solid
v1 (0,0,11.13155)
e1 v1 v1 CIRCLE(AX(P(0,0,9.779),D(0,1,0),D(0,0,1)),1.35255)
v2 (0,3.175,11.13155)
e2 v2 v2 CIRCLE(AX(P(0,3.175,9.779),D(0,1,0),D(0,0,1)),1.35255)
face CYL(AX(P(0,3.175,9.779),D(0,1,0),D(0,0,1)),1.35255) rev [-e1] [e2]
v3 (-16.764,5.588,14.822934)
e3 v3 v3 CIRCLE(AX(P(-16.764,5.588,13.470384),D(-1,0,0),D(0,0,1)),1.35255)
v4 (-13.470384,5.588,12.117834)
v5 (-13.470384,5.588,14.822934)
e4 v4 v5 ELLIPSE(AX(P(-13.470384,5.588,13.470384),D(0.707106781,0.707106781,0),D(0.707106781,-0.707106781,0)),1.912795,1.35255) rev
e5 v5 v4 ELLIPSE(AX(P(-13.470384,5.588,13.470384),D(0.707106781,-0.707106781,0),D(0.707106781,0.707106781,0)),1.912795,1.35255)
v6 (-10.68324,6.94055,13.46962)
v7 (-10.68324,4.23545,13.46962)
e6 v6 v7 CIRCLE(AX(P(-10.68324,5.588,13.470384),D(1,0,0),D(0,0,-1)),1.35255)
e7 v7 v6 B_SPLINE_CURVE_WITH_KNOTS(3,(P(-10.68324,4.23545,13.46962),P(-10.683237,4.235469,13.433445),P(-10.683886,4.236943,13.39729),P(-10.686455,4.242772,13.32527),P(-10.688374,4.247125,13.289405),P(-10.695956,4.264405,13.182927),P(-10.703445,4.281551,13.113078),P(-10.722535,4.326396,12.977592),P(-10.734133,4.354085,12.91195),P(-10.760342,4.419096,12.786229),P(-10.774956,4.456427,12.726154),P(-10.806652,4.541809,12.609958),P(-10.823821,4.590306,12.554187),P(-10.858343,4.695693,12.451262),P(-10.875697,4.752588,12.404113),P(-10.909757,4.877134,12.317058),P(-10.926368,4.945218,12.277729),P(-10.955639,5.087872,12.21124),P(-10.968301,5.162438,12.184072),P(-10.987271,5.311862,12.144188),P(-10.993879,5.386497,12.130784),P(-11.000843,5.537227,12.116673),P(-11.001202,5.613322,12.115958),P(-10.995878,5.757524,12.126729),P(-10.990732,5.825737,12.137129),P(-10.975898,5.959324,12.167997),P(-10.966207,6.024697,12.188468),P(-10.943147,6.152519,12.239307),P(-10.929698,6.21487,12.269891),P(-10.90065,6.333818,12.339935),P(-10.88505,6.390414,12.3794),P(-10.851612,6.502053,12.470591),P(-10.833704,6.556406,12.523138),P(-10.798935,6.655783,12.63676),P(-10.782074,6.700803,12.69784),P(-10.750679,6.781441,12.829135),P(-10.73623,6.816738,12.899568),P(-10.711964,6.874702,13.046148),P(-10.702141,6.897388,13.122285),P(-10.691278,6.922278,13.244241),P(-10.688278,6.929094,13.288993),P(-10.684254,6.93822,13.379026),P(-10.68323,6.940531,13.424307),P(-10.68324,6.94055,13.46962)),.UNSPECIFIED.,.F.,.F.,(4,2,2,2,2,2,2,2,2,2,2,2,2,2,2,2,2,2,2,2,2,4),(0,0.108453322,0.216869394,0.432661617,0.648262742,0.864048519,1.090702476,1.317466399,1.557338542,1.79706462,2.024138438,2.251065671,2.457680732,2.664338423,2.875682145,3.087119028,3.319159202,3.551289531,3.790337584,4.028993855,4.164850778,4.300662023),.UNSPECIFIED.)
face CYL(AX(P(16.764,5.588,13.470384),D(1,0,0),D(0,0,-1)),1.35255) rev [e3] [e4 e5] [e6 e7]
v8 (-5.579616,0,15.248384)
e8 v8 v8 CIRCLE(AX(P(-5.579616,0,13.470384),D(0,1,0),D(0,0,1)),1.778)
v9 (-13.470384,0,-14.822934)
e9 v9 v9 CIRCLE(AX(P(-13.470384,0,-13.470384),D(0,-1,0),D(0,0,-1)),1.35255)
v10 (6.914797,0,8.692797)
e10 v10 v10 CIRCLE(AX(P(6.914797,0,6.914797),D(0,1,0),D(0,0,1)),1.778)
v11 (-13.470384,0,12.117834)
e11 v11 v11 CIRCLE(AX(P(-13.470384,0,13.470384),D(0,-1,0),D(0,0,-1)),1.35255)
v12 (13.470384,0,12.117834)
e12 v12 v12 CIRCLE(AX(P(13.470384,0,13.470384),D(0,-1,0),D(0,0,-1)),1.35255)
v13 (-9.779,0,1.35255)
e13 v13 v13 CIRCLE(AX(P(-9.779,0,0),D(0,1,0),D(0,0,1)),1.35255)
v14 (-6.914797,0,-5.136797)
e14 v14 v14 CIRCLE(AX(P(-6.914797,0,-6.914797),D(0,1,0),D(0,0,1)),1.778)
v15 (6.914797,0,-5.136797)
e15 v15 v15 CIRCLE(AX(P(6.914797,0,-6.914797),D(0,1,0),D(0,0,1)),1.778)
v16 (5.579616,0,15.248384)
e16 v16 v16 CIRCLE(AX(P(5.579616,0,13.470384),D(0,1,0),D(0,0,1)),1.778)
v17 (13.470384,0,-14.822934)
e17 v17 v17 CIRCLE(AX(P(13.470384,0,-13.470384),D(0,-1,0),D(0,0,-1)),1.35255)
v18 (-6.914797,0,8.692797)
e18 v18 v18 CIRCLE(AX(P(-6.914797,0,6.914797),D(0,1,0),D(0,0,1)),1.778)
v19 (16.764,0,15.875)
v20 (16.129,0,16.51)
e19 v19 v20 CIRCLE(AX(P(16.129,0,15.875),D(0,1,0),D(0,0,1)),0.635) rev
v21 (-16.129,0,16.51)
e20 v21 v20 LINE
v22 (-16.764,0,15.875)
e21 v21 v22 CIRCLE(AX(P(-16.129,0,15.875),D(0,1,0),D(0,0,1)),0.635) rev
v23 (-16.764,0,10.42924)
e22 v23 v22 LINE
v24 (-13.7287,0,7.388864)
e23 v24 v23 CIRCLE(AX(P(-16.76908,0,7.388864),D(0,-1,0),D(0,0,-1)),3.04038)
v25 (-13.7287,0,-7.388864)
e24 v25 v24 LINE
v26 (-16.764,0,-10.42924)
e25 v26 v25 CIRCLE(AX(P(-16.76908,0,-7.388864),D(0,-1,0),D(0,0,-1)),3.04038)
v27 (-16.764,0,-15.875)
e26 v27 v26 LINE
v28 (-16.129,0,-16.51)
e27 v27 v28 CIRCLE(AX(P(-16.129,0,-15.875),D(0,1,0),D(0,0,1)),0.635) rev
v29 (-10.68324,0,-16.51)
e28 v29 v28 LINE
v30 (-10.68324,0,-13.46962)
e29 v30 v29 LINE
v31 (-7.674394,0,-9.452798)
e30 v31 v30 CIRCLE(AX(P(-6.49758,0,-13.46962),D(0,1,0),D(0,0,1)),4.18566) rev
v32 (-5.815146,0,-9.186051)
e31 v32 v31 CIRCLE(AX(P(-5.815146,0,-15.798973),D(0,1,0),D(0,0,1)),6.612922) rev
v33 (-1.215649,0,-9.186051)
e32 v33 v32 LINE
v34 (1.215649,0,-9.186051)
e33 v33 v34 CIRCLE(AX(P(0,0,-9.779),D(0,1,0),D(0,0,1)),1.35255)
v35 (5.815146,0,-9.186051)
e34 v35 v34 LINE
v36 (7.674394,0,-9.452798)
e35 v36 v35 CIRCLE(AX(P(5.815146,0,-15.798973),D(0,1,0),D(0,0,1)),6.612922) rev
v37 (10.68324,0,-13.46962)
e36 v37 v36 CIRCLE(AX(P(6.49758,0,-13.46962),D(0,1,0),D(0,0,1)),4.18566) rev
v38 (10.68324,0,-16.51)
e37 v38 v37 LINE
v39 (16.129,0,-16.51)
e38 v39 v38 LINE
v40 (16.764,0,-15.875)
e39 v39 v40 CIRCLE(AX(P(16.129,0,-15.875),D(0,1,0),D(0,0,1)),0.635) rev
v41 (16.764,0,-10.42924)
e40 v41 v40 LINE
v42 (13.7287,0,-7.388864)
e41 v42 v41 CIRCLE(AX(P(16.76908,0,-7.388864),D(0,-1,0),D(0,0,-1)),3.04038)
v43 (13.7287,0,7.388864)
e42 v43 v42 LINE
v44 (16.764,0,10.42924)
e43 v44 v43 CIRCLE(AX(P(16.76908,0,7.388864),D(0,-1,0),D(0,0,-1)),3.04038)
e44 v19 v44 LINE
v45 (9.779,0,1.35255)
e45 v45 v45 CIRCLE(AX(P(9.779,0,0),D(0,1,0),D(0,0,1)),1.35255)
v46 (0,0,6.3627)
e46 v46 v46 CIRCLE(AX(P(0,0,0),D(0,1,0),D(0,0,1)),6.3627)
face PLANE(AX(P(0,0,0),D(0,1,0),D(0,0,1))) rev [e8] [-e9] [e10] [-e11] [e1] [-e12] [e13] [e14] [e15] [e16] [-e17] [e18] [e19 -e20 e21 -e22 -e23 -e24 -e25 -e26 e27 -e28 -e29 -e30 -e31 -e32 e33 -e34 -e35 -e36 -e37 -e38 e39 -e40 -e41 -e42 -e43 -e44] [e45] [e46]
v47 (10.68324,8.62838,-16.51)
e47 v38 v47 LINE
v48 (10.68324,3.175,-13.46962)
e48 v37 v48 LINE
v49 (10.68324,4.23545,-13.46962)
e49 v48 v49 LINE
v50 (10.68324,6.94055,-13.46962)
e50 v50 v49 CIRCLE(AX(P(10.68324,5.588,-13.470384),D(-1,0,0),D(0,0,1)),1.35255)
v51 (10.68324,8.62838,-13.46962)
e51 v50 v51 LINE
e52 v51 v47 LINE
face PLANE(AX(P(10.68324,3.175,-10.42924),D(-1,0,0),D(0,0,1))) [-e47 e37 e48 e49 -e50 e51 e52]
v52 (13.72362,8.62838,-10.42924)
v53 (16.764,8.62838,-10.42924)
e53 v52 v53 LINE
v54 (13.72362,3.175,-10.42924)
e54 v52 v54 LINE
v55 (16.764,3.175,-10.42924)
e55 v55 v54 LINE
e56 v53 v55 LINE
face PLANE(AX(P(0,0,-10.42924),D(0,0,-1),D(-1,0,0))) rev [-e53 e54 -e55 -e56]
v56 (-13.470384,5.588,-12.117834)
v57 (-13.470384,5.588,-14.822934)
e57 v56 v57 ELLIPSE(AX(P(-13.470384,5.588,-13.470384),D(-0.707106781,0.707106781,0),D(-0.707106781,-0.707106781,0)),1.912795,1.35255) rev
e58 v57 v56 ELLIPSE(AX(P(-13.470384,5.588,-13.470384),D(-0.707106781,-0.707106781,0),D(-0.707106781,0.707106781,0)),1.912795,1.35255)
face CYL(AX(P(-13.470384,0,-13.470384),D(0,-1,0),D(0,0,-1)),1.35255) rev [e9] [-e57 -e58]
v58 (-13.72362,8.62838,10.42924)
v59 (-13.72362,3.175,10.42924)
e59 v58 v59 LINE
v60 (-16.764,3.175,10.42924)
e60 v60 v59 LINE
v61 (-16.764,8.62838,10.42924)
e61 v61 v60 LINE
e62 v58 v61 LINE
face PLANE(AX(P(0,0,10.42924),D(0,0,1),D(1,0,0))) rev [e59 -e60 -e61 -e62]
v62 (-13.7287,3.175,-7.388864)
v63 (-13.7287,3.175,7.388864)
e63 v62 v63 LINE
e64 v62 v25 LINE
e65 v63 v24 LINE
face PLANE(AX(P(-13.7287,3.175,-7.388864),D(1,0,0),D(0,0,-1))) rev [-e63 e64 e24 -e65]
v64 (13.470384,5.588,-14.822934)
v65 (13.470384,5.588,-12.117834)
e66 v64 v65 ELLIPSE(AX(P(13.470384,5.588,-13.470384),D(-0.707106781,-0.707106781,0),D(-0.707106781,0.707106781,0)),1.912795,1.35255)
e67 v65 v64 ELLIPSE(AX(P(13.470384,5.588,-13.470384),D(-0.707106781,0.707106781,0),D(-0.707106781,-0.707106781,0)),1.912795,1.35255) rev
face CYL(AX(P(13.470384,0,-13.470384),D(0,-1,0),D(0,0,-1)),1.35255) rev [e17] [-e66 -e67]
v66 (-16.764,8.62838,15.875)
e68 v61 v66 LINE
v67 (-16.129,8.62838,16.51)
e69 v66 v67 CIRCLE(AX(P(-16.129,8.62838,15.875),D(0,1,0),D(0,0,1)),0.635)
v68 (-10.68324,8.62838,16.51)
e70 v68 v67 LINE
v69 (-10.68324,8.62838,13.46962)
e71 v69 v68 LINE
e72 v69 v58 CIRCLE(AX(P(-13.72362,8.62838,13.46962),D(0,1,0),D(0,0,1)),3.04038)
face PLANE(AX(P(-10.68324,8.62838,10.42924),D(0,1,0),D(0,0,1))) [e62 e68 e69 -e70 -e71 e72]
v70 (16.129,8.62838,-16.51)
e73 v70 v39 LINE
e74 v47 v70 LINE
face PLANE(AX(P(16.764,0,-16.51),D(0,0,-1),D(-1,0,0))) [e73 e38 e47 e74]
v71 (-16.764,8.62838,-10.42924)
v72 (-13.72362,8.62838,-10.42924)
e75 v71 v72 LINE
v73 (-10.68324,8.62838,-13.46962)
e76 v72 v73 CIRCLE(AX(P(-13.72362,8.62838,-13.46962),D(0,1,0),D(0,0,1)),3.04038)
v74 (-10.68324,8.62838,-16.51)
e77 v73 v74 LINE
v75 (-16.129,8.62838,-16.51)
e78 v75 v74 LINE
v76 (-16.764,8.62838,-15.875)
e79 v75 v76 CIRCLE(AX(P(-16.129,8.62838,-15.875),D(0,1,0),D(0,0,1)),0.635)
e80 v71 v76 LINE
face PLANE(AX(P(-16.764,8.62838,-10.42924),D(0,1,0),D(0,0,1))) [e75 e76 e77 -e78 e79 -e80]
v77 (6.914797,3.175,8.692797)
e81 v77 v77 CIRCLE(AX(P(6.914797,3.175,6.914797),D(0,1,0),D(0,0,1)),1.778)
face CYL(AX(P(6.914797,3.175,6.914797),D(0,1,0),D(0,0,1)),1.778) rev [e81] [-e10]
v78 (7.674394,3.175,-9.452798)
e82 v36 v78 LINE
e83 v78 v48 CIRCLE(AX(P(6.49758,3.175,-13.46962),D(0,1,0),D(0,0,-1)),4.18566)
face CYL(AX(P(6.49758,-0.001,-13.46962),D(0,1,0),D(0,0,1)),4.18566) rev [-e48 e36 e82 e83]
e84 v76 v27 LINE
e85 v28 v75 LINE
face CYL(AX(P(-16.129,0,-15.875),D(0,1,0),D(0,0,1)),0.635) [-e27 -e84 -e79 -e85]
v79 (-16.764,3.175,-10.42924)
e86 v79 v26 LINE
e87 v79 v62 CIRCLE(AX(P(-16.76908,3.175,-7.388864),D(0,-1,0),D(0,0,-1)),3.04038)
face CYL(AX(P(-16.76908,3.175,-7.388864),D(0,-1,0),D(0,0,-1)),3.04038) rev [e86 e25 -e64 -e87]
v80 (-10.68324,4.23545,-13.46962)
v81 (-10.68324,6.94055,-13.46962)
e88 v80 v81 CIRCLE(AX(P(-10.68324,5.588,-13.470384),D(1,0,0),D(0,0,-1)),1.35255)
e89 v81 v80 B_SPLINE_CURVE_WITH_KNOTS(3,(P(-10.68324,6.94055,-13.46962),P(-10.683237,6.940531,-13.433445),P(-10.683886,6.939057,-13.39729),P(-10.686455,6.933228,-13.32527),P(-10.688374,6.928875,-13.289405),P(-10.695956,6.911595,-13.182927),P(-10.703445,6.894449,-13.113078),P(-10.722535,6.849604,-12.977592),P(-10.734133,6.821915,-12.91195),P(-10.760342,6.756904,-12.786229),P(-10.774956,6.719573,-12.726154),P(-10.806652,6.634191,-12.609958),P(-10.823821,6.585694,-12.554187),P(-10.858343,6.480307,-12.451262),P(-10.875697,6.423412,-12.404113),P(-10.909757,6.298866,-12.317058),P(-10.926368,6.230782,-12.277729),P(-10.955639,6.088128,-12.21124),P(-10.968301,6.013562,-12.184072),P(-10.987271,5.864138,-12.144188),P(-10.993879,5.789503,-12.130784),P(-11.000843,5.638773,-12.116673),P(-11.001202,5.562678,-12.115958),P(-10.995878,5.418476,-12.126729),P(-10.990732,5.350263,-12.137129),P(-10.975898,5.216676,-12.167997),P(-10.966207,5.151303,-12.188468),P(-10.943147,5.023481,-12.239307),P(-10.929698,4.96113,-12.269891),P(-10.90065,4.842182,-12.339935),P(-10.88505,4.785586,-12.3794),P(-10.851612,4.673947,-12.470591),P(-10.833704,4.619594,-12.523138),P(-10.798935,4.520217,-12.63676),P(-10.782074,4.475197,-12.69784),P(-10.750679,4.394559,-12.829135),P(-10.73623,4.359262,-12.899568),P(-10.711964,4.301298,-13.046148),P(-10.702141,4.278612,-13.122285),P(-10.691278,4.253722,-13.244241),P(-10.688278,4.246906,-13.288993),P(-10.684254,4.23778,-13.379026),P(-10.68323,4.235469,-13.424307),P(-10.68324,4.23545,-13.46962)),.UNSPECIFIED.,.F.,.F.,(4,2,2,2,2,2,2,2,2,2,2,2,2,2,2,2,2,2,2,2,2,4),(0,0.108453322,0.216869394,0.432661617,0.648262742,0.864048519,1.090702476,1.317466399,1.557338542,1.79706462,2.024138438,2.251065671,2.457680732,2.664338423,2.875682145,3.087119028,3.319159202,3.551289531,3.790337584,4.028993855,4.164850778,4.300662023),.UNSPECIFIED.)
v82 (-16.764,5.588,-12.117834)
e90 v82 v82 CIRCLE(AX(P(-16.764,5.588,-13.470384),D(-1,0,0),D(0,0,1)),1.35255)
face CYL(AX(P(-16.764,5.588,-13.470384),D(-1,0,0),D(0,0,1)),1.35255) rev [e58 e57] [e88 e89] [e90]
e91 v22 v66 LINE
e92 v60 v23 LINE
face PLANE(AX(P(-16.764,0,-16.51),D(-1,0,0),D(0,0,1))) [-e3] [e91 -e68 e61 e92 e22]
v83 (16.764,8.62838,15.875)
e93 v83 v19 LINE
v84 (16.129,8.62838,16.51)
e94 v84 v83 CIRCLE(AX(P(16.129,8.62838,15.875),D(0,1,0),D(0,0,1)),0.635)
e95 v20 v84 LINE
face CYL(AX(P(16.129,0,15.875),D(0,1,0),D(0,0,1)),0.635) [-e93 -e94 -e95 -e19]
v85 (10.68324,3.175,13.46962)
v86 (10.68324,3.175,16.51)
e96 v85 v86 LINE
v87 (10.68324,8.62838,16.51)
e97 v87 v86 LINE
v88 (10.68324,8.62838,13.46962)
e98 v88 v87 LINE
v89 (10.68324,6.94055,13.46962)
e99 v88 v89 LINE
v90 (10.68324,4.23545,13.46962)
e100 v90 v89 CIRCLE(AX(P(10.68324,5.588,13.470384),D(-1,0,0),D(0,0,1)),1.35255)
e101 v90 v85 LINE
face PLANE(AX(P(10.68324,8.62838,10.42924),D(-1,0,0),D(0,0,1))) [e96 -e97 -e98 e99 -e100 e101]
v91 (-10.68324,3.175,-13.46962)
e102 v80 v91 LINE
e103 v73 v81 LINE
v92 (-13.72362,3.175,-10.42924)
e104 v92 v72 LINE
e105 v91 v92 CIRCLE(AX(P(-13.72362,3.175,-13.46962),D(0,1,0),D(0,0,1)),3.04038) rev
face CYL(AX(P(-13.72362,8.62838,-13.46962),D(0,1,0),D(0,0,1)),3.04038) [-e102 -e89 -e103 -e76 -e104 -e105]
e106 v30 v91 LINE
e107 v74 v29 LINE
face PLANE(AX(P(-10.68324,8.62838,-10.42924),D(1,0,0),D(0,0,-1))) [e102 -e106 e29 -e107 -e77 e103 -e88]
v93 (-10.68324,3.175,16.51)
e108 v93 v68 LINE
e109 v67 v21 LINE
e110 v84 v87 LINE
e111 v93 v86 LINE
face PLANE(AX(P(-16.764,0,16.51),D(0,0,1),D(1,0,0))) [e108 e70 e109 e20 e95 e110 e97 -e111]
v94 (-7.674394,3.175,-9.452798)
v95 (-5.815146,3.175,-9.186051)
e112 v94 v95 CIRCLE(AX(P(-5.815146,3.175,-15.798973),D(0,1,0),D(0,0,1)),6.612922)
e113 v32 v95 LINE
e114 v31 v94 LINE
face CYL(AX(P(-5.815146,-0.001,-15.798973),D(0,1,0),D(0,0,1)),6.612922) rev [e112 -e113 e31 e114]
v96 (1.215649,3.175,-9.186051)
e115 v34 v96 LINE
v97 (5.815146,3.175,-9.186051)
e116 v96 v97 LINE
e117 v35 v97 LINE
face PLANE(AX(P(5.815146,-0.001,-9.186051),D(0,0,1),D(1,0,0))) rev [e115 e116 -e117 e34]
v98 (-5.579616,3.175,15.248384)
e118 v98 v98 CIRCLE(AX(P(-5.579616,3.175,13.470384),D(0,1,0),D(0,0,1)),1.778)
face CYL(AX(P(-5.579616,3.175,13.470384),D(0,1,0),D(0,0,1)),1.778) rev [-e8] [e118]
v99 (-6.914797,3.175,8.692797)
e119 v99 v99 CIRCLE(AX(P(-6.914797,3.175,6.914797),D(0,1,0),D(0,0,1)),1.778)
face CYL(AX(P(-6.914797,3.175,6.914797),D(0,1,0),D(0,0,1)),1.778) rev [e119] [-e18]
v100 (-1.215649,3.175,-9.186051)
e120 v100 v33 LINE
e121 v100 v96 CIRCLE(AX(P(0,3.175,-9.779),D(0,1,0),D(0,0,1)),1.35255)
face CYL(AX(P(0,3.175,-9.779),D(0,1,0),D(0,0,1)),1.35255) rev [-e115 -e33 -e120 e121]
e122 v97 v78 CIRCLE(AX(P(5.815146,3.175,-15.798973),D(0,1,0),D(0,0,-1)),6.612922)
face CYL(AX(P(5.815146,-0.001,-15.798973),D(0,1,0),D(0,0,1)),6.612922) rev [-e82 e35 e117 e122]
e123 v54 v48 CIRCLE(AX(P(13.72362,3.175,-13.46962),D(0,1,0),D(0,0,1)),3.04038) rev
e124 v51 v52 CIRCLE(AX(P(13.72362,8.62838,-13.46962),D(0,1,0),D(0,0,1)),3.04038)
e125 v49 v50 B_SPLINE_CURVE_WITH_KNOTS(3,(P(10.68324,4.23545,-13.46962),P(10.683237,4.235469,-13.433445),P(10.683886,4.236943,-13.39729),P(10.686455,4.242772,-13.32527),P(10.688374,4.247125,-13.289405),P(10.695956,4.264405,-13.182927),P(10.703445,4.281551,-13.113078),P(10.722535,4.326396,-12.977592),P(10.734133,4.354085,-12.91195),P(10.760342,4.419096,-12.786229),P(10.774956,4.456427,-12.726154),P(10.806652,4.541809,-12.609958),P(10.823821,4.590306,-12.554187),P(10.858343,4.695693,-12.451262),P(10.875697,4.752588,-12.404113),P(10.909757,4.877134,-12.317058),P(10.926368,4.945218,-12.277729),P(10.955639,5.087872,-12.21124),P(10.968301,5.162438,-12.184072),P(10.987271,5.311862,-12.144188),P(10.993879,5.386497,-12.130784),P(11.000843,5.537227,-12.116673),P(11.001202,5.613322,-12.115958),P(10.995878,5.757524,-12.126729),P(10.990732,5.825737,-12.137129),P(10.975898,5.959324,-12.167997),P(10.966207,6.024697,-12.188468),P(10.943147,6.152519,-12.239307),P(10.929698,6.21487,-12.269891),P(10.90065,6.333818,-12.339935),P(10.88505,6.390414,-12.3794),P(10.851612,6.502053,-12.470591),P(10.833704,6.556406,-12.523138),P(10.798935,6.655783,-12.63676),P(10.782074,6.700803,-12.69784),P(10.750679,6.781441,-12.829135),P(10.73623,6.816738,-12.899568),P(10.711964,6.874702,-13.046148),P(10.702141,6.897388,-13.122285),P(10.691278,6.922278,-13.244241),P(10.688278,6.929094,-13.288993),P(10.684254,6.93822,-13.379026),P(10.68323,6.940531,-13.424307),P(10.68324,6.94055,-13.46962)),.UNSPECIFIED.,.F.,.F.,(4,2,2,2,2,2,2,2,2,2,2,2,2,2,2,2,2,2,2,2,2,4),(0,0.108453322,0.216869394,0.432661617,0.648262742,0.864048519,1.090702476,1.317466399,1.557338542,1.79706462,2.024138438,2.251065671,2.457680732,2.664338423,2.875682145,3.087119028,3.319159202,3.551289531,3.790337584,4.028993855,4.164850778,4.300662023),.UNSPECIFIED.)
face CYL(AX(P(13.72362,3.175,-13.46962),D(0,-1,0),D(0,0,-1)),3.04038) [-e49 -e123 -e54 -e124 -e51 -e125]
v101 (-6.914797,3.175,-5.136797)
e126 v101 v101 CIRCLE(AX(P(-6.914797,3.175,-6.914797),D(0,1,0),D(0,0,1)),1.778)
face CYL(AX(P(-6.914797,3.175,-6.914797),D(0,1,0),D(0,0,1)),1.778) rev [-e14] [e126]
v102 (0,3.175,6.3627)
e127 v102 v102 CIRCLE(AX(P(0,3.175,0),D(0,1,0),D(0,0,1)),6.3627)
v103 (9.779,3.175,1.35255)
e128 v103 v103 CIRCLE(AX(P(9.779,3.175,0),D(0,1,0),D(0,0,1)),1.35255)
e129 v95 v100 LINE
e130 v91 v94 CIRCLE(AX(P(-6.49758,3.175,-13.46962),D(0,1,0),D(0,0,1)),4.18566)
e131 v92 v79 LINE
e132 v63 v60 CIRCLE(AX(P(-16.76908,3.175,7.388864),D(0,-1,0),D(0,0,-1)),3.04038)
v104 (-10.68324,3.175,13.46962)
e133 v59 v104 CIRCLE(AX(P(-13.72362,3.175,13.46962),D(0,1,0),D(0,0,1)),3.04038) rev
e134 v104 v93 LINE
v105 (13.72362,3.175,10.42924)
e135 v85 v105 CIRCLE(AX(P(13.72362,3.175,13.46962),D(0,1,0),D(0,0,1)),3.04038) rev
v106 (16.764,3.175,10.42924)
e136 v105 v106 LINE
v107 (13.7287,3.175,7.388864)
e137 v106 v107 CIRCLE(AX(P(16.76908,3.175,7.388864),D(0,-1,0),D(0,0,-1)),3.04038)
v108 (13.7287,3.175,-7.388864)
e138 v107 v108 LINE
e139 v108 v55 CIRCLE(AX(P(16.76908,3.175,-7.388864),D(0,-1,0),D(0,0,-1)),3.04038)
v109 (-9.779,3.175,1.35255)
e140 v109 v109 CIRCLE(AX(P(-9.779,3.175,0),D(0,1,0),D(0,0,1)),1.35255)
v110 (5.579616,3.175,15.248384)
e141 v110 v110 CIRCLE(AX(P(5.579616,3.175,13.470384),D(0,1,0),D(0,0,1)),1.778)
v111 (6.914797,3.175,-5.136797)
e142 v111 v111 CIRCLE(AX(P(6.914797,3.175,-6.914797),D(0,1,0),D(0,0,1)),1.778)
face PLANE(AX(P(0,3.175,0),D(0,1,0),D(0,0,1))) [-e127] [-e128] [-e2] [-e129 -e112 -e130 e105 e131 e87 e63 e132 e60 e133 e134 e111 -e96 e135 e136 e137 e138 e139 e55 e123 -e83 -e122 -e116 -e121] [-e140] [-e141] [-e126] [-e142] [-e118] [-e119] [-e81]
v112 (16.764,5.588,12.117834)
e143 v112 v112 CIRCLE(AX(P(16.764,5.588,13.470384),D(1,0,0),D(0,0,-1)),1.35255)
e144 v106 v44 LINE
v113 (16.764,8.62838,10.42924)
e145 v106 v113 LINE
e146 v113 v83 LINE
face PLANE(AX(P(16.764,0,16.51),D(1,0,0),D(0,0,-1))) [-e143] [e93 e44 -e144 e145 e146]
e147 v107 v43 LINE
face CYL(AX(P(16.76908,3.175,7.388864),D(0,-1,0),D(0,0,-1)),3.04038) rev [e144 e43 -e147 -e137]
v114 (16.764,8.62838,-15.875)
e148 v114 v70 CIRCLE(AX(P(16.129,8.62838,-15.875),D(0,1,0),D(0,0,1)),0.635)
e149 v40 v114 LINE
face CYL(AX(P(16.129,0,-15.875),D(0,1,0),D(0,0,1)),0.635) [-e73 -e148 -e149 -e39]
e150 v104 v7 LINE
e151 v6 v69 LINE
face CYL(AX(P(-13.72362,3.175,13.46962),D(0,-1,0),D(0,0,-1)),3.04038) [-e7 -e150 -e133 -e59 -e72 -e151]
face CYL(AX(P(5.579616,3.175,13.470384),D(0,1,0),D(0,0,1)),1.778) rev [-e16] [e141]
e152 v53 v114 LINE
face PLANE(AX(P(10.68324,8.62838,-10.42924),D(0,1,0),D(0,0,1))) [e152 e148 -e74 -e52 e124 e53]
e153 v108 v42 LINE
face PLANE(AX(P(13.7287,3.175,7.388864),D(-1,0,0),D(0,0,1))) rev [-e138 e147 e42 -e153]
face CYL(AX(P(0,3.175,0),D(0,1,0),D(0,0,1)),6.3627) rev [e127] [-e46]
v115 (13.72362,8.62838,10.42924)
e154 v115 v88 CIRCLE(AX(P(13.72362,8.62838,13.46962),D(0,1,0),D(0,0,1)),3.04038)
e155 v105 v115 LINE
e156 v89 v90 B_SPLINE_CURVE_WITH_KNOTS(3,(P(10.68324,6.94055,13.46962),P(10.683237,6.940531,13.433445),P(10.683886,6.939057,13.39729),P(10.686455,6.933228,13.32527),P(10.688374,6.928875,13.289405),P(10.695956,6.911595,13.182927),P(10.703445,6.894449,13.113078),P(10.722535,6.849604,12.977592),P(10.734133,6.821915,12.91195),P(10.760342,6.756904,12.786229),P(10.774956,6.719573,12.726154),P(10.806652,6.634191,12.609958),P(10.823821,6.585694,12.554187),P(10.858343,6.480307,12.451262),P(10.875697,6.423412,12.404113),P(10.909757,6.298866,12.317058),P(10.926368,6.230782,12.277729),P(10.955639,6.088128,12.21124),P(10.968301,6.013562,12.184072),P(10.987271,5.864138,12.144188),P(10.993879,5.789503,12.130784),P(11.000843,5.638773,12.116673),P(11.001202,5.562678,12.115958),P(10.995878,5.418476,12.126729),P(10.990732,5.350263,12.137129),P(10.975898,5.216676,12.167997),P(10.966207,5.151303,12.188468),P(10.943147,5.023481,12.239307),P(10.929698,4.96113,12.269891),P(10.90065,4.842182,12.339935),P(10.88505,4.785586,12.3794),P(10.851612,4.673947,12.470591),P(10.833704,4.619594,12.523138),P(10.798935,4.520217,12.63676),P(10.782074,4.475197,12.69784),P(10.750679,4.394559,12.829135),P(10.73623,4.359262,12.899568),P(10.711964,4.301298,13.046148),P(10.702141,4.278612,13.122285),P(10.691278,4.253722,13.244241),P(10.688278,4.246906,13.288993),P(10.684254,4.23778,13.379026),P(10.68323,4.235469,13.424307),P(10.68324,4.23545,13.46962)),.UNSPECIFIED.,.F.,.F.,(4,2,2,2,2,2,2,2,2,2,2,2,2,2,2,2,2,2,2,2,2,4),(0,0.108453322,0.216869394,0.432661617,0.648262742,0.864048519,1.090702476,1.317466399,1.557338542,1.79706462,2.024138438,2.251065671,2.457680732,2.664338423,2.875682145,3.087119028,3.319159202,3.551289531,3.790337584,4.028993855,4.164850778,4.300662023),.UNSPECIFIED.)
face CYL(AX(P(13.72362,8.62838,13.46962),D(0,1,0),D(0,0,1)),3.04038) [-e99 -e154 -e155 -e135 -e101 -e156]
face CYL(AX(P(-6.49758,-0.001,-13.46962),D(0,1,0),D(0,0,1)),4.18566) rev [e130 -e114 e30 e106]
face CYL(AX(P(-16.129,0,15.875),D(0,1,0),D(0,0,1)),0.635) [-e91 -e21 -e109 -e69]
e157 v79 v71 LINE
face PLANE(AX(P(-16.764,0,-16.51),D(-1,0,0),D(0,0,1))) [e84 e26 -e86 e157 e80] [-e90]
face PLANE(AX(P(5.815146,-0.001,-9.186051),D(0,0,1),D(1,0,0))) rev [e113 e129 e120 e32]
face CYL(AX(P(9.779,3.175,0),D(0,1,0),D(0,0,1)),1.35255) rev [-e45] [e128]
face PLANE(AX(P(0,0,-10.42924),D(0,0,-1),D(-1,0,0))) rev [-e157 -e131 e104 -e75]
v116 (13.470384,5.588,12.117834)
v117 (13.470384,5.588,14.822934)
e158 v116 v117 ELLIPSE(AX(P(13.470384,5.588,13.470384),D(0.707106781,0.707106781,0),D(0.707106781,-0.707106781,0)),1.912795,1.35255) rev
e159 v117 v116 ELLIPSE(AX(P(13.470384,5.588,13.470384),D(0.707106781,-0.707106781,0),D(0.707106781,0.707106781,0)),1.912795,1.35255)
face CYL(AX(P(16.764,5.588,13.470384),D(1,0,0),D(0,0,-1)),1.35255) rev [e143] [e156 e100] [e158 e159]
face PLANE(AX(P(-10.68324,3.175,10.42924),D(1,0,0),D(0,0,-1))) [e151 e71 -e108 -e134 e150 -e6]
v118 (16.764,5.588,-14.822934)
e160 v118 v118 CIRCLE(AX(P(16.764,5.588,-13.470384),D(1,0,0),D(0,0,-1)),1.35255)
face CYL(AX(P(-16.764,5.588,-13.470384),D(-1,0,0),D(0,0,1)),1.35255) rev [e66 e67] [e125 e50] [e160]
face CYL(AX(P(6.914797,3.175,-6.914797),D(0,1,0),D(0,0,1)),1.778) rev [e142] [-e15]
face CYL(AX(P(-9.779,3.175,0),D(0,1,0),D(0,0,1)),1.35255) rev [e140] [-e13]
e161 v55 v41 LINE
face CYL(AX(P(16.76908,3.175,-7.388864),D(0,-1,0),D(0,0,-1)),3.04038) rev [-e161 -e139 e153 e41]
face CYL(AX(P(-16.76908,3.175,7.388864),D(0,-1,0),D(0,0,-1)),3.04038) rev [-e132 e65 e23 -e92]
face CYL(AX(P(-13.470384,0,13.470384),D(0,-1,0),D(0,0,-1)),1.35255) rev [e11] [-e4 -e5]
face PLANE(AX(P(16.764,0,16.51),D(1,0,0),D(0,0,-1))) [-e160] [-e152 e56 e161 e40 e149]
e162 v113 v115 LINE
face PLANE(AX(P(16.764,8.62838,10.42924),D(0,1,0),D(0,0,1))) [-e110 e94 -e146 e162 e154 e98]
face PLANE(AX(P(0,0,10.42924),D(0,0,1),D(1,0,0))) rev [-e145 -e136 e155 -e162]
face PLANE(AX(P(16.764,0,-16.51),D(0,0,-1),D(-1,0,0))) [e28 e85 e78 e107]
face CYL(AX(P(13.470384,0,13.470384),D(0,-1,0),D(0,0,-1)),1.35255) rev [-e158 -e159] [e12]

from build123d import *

# Parameters (mm, degrees)
SKETCH1_W                   = 33.528
SKETCH1_H                   = 33.02
BOSS_EXTRUDE1_DEPTH         = 3.175
CUT_EXTRUDE1_DEPTH          = 24.742207585
CUT_EXTRUDE2_DEPTH          = 24.742207585
SKETCH4_W                   = 6.08076
SKETCH4_H                   = 5.45338
BOSS_EXTRUDE2_DEPTH         = 6.08076
SKETCH5_W                   = 6.08076
SKETCH5_H                   = 5.45338
BOSS_EXTRUDE3_DEPTH         = 6.08076
SKETCH6_W                   = 6.08076
SKETCH6_H                   = 5.45338
BOSS_EXTRUDE4_DEPTH         = 6.08076
SKETCH7_W                   = 6.08076
SKETCH7_H                   = 5.45338
BOSS_EXTRUDE5_DEPTH         = 6.08076
HOLE1_D                     = 12.7254
M2_5_CLEARANCE_HOLE1_D      = 2.7051
M3_CLEARANCE_HOLE1_D        = 3.556
M2_5_CLEARANCE_HOLE2_D      = 2.7051
M2_5_CLEARANCE_HOLE2_DEPTH  = 39.60876
M2_5_CLEARANCE_HOLE3_D      = 2.7051
M2_5_CLEARANCE_HOLE3_DEPTH  = 39.60876
M2_5_CLEARANCE_HOLE4_REACH  = 27.061
M2_5_CLEARANCE_HOLE4_BORE_R = 1.35255
FILLET1_R                   = 0.635
FILLET2_R                   = 3.04038
CUT_EXTRUDE3_REACH          = 26.153


with BuildPart() as part:
    # Sketch1 → Boss-Extrude1 (new body)
    with BuildSketch(Plane(origin=(0, 3.175, 0), x_dir=(1, 0, 0), z_dir=(0, 1, 0))):
        Rectangle(SKETCH1_W, SKETCH1_H)
    extrude(amount=-BOSS_EXTRUDE1_DEPTH)

    # Sketch2 → Cut-Extrude1 (cut, through all)
    with BuildSketch(Plane.XZ):
        with BuildLine():
            Line((16.764, -10.42924), (16.764, 10.42924))
            ThreePointArc((16.764, 10.42924), (14.617411383, 9.536940757), (13.7287, 7.388864244))
            Line((13.7287, 7.388864244), (13.7287, -7.388864244))
            ThreePointArc((13.7287, -7.388864244), (14.617411383, -9.536940757), (16.764, -10.42924))
        make_face()
    extrude(amount=-CUT_EXTRUDE1_DEPTH, mode=Mode.SUBTRACT)

    # Sketch3 → Cut-Extrude2 (cut, through all)
    with BuildSketch(Plane.XZ):
        with BuildLine():
            Line((-16.764, 10.42924), (-16.764, -10.42924))
            ThreePointArc((-16.764, -10.42924), (-14.617411383, -9.536940757), (-13.7287, -7.388864244))
            Line((-13.7287, -7.388864244), (-13.7287, 7.388864244))
            ThreePointArc((-13.7287, 7.388864244), (-14.617411383, 9.536940757), (-16.764, 10.42924))
        make_face()
    extrude(amount=-CUT_EXTRUDE2_DEPTH, mode=Mode.SUBTRACT)

    # Sketch4 → Boss-Extrude2 (add)
    with BuildSketch(Plane(origin=(0, 0, -16.51), x_dir=(-1, 0, 0), z_dir=(0, 0, -1))):
        with Locations((13.72362, 5.90169)):
            Rectangle(SKETCH4_W, SKETCH4_H)
    extrude(amount=-BOSS_EXTRUDE2_DEPTH)

    # Sketch5 → Boss-Extrude3 (add)
    with BuildSketch(Plane(origin=(0, 0, -16.51), x_dir=(-1, 0, 0), z_dir=(0, 0, -1))):
        with Locations((-13.72362, 5.90169)):
            Rectangle(SKETCH5_W, SKETCH5_H)
    extrude(amount=-BOSS_EXTRUDE3_DEPTH)

    # Sketch6 → Boss-Extrude4 (add)
    with BuildSketch(Plane.XY.offset(16.51)):
        with Locations((13.72362, 5.90169)):
            Rectangle(SKETCH6_W, SKETCH6_H)
    extrude(amount=-BOSS_EXTRUDE4_DEPTH)

    # Sketch7 → Boss-Extrude5 (add)
    with BuildSketch(Plane.XY.offset(16.51)):
        with Locations((-13.72362, 5.90169)):
            Rectangle(SKETCH7_W, SKETCH7_H)
    extrude(amount=-BOSS_EXTRUDE5_DEPTH)

    # Hole1 (through all)
    with Locations(Plane(origin=(0, 3.175, 0), x_dir=(1, 0, 0), z_dir=(0, 1, 0))):
        with Locations((0, 0)):
            Hole(HOLE1_D / 2)

    # M2.5 Clearance Hole1 (through all)
    with Locations(Plane(origin=(0, 3.175, 0), x_dir=(1, 0, 0), z_dir=(0, 1, 0))):
        with Locations((0, 9.779), (-9.779, 0), (0, -9.779), (9.779, 0)):
            Hole(M2_5_CLEARANCE_HOLE1_D / 2)

    # M3 Clearance Hole1 (through all)
    with Locations(Plane(origin=(0, 3.175, 0), x_dir=(1, 0, 0), z_dir=(0, 1, 0))):
        with Locations((-5.579615818, -13.470384182), (5.579615818, -13.470384182), (5.579615818, 13.470384182), (-5.579615818, 13.470384182), (6.914797213, 6.914797213), (-6.914797213, 6.914797213), (-6.914797213, -6.914797213), (6.914797213, -6.914797213)):
            Hole(M3_CLEARANCE_HOLE1_D / 2)

    # M2.5 Clearance Hole2
    with Locations(Plane(origin=(16.764, 0, 0), x_dir=(0, 0, -1), z_dir=(1, 0, 0))):
        with Locations((-13.470384182, 5.588)):
            Hole(M2_5_CLEARANCE_HOLE2_D / 2, depth=M2_5_CLEARANCE_HOLE2_DEPTH)

    # M2.5 Clearance Hole3
    with Locations(Plane.ZY.offset(16.764)):
        with Locations((-13.470384182, 5.588)):
            Hole(M2_5_CLEARANCE_HOLE3_D / 2, depth=M2_5_CLEARANCE_HOLE3_DEPTH)

    # M2.5 Clearance Hole4 bore → M2.5 Clearance Hole4 (cut, up to next)
    with BuildSketch(Plane(origin=(0, 0, 0), x_dir=(-1, 0, 0), z_dir=(0, -1, 0)), mode=Mode.PRIVATE) as m2_5_clearance_hole4_sk1:
        with Locations((13.470384182, 13.470384182)):
            Circle(M2_5_CLEARANCE_HOLE4_BORE_R)
    m2_5_clearance_hole4_tool1 = extrude(m2_5_clearance_hole4_sk1.sketch, amount=-M2_5_CLEARANCE_HOLE4_REACH, mode=Mode.PRIVATE) & part.part
    # M2.5 Clearance Hole4 bore → M2.5 Clearance Hole4 (cut, up to next)
    with BuildSketch(Plane(origin=(0, 0, 0), x_dir=(-1, 0, 0), z_dir=(0, -1, 0)), mode=Mode.PRIVATE) as m2_5_clearance_hole4_sk2:
        with Locations((-13.470384182, 13.470384182)):
            Circle(M2_5_CLEARANCE_HOLE4_BORE_R)
    m2_5_clearance_hole4_tool2 = extrude(m2_5_clearance_hole4_sk2.sketch, amount=-M2_5_CLEARANCE_HOLE4_REACH, mode=Mode.PRIVATE) & part.part
    # M2.5 Clearance Hole4 bore → M2.5 Clearance Hole4 (cut, up to next)
    with BuildSketch(Plane(origin=(0, 0, 0), x_dir=(-1, 0, 0), z_dir=(0, -1, 0)), mode=Mode.PRIVATE) as m2_5_clearance_hole4_sk3:
        with Locations((-13.470384182, -13.470384182)):
            Circle(M2_5_CLEARANCE_HOLE4_BORE_R)
    m2_5_clearance_hole4_tool3 = extrude(m2_5_clearance_hole4_sk3.sketch, amount=-M2_5_CLEARANCE_HOLE4_REACH, mode=Mode.PRIVATE) & part.part
    # M2.5 Clearance Hole4 bore → M2.5 Clearance Hole4 (cut, up to next)
    with BuildSketch(Plane(origin=(0, 0, 0), x_dir=(-1, 0, 0), z_dir=(0, -1, 0)), mode=Mode.PRIVATE) as m2_5_clearance_hole4_sk4:
        with Locations((13.470384182, -13.470384182)):
            Circle(M2_5_CLEARANCE_HOLE4_BORE_R)
    m2_5_clearance_hole4_tool4 = extrude(m2_5_clearance_hole4_sk4.sketch, amount=-M2_5_CLEARANCE_HOLE4_REACH, mode=Mode.PRIVATE) & part.part
    add(m2_5_clearance_hole4_tool1.solids().sort_by_distance((-13.470384, 0, -13.470384))[0], mode=Mode.SUBTRACT)
    add(m2_5_clearance_hole4_tool2.solids().sort_by_distance((13.470384, 0, -13.470384))[0], mode=Mode.SUBTRACT)
    add(m2_5_clearance_hole4_tool3.solids().sort_by_distance((13.470384, 0, 13.470384))[0], mode=Mode.SUBTRACT)
    add(m2_5_clearance_hole4_tool4.solids().sort_by_distance((-13.470384, 0, 13.470384))[0], mode=Mode.SUBTRACT)

    # Fillet1
    fillet1_edges = [part.edges().sort_by_distance(p)[0] for p in [
        (-16.764, 4.31419, 16.51),
        (-16.764, 4.31419, -16.51),
        (16.764, 4.31419, -16.51),
        (16.764, 4.31419, 16.51),
    ]]
    fillet(fillet1_edges, radius=FILLET1_R)

    # Fillet2
    # the kernel refuses this fillet: 3.04038 mm, written as the material it takes off along each edge
    with BuildSketch(Plane(origin=(-10.68324, 16.22933, -10.42924), x_dir=(-1, 0, 0), z_dir=(0, -1, 0)), Plane(origin=(10.68324, 16.22933, 10.42924), x_dir=(1, 0, 0), z_dir=(0, -1, 0)), Plane(origin=(-10.68324, 3.175, 10.42924), x_dir=(-1, 0, 0), z_dir=(0, 1, 0))) as fillet2_piece_1:
        with BuildLine():
            CenterArc((FILLET2_R, FILLET2_R), FILLET2_R, 180, 90)
            Line((0, FILLET2_R), (0, 0))
            Line((0, 0), (FILLET2_R, 0))
        make_face()
    extrude(amount=13.05433, mode=Mode.SUBTRACT)
    with BuildSketch(Plane(origin=(10.68324, 3.175, -10.42924), x_dir=(0, 0, -1), z_dir=(0, 1, 0))) as fillet2_piece_2:
        with BuildLine():
            CenterArc((FILLET2_R, -FILLET2_R), FILLET2_R, 90, 90)
            Line((0, -FILLET2_R), (0, 0))
            Line((0, 0), (FILLET2_R, 0))
        make_face()
    extrude(amount=13.05433, mode=Mode.SUBTRACT)

    # Sketch20 → Cut-Extrude3 (cut, up to next)
    with BuildSketch(Plane(origin=(0, 3.175, 0), x_dir=(1, 0, 0), z_dir=(0, 1, 0)), mode=Mode.PRIVATE) as cut_extrude3_sk1:
        with BuildLine():
            Line((5.815146261, 9.186050919), (-5.815146261, 9.186050919))
            ThreePointArc((-5.815146261, 9.186050919), (-6.754288773, 9.253077351), (-7.674393598, 9.452797931))
            ThreePointArc((-7.674393598, 9.452797931), (-9.84761666, 10.960236799), (-10.68324, 13.46962))
            Line((-10.68324, 13.46962), (-10.68324, 16.51))
            Line((-10.68324, 16.51), (10.68324, 16.51))
            Line((10.68324, 16.51), (10.68324, 13.46962))
            ThreePointArc((10.68324, 13.46962), (9.84761666, 10.960236799), (7.674393598, 9.452797931))
            ThreePointArc((7.674393598, 9.452797931), (6.754288773, 9.253077351), (5.815146261, 9.186050919))
        make_face()
    cut_extrude3_tool1 = extrude(cut_extrude3_sk1.sketch, amount=-CUT_EXTRUDE3_REACH, mode=Mode.PRIVATE) & part.part
    add(cut_extrude3_tool1.solids().sort_by_distance((0, 3.175, -13.000619))[0], mode=Mode.SUBTRACT)


solid = part.part
